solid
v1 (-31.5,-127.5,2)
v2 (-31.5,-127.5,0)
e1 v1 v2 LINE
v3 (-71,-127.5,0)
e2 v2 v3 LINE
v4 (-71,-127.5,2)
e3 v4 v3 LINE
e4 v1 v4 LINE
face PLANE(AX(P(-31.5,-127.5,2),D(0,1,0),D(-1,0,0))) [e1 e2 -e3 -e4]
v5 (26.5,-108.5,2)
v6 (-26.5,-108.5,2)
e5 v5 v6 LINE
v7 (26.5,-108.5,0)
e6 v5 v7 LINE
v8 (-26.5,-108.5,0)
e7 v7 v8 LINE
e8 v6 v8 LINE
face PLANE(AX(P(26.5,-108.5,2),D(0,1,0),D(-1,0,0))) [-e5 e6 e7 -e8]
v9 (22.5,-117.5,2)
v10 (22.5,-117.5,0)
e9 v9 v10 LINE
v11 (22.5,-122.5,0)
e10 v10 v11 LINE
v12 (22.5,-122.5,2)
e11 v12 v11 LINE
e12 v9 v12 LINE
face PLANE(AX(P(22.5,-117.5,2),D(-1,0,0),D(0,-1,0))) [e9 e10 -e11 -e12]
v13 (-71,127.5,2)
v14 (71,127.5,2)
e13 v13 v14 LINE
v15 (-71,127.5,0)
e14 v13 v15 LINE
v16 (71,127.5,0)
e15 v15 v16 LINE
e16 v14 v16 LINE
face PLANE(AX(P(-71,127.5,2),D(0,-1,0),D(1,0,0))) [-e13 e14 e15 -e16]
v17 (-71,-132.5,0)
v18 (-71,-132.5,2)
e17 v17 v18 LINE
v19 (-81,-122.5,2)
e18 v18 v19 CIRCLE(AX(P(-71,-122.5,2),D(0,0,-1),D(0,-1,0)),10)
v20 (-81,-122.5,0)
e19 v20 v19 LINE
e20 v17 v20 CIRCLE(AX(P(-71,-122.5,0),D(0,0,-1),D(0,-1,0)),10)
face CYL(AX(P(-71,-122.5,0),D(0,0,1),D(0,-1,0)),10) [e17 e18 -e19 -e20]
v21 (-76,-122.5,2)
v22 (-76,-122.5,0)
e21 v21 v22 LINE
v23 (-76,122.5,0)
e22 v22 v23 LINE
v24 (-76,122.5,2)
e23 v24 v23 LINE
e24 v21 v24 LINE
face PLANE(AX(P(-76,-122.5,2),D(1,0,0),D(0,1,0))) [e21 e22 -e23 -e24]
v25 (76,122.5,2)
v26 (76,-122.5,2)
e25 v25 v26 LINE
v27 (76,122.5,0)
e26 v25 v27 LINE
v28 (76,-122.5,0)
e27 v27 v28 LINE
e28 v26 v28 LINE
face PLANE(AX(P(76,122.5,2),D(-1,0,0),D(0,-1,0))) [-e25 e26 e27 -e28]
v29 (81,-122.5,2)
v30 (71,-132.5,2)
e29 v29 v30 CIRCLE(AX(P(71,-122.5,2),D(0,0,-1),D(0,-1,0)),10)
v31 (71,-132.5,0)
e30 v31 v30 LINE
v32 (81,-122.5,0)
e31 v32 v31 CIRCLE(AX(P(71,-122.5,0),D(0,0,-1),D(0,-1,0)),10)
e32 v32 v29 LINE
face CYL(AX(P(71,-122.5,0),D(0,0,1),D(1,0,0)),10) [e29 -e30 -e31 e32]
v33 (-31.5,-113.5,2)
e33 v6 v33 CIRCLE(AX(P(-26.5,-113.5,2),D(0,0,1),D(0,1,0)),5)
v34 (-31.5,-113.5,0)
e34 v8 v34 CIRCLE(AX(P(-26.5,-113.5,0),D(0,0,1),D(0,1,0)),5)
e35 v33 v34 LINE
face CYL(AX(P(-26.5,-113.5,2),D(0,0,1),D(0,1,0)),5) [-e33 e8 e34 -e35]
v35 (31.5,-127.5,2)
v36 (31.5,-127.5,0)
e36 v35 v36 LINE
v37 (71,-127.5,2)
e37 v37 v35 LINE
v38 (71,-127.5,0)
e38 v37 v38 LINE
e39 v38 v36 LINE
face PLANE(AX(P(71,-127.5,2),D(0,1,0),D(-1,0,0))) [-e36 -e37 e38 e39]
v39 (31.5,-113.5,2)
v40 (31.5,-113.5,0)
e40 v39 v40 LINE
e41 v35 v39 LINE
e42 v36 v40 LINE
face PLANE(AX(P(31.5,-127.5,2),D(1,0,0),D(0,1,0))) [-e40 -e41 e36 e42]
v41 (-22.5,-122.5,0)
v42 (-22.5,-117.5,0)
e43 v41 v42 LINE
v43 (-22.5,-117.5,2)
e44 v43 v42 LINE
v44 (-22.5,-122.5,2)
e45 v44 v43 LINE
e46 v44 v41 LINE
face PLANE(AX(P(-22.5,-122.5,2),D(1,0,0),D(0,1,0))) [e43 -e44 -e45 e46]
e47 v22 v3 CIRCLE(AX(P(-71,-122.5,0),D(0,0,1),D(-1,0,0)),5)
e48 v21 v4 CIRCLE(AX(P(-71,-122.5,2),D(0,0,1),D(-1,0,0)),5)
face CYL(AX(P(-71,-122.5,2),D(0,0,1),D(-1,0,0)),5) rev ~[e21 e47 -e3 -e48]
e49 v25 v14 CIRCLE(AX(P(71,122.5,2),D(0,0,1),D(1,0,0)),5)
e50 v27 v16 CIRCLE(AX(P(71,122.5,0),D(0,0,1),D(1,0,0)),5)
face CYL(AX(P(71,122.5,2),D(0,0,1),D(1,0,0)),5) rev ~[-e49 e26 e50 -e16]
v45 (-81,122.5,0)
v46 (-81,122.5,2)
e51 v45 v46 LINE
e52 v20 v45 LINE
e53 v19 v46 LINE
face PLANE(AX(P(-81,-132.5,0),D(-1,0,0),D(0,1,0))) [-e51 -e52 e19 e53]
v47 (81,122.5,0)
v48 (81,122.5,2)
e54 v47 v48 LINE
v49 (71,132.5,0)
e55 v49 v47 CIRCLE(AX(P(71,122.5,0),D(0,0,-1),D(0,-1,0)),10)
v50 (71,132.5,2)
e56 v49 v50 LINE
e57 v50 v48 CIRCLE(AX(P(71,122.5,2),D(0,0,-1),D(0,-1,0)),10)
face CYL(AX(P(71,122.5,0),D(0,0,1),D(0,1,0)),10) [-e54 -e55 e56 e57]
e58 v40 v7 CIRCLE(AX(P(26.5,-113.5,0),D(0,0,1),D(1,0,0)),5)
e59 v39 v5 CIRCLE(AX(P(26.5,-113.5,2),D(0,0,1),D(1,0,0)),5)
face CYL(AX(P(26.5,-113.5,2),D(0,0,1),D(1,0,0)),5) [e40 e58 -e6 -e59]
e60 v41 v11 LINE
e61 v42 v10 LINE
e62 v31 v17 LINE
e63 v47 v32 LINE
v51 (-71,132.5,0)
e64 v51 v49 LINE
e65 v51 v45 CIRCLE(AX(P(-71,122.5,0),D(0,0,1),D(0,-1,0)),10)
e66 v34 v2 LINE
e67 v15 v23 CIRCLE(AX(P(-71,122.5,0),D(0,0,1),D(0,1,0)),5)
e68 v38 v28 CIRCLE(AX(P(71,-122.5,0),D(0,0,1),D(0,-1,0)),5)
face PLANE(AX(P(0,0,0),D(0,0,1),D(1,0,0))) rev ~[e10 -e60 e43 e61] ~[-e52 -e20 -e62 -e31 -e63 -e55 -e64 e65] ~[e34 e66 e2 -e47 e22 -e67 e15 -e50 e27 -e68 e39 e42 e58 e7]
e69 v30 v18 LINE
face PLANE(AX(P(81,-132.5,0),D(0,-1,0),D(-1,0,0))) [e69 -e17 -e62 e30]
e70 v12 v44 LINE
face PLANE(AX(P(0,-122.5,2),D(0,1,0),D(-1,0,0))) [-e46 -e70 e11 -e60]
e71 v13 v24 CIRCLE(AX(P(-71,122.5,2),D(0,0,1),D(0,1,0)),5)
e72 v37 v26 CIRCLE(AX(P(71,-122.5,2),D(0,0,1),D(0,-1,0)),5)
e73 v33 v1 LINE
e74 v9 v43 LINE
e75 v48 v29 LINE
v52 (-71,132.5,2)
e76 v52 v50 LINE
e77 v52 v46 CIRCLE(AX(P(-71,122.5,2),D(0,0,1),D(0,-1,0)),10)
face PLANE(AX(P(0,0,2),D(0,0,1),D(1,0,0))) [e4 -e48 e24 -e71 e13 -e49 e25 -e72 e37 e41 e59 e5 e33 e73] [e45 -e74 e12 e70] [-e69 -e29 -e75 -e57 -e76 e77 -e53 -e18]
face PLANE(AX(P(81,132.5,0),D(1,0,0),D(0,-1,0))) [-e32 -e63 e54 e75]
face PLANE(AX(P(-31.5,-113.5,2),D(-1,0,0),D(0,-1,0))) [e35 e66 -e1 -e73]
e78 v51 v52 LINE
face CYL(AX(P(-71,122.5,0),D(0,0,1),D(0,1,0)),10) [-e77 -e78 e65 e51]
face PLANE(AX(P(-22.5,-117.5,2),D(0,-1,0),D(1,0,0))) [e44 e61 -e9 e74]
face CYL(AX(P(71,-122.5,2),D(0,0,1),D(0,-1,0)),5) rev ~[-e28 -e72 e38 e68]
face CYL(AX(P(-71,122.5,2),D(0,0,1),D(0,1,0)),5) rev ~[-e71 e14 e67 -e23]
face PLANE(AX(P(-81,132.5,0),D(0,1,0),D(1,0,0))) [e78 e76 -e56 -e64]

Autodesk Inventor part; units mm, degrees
ref_plane "YZ Plane" through (0, 0, 0) normal (1, 0, 0) x (0, 1, 0)
ref_plane "XZ Plane" through (0, 0, 0) normal (0, 1, 0) x (-1, 0, 0)
ref_plane "XY Plane" through (0, 0, 0) normal (0, 0, 1) x (1, 0, 0)
sketch "Skizze1" plane through (0, 0, 0) normal (0, 0, 1) x (1, 0, 0)
  line L0 (-81, 132.5) -> (81, 132.5)
  line L1 (81, 132.5) -> (81, -132.5)
  line L2 (81, -132.5) -> (-81, -132.5)
  line L3 (-81, -132.5) -> (-81, 132.5)
  line L4 (-81, 132.5) -> (81, -132.5) construction
  line L5 (81, 132.5) -> (-81, -132.5) construction
  point P0 (0, 0)
  dimension "d0" = 162
  dimension "d1" = 265
extrude "Grobblech1" add sketch "Skizze1" along normal blind 2
fillet "Eckenrundung1" radius 10 4 edges at (-81, 132.5, 1) (81, 132.5, 1) (81, -132.5, 1) (-81, -132.5, 1)
sketch "Skizze2" plane through (0, 0, 2) normal (0, 0, 1) x (1, 0, 0)
  arc A0 (-81, -122.5) -> (-71, -132.5) centre (-71, -122.5) ccw projected
  line L0 (71, -132.5) -> (-71, -132.5) projected
  arc A1 (71, -132.5) -> (81, -122.5) centre (71, -122.5) ccw projected
  line L1 (81, 122.5) -> (81, -122.5) projected
  arc A2 (81, 122.5) -> (71, 132.5) centre (71, 122.5) ccw projected
  line L2 (-71, 132.5) -> (71, 132.5) projected
  arc A3 (-71, 132.5) -> (-81, 122.5) centre (-71, 122.5) ccw projected
  line L3 (-81, -122.5) -> (-81, 122.5) projected
  arc A4 (76, 122.5) -> (71, 127.5) centre (71, 122.5) ccw
  line L4 (76, 122.5) -> (76, -122.5)
  arc A5 (71, -127.5) -> (76, -122.5) centre (71, -122.5) ccw
  line L5 (71, -127.5) -> (-71, -127.5)
  arc A6 (-76, -122.5) -> (-71, -127.5) centre (-71, -122.5) ccw
  line L6 (-76, -122.5) -> (-76, 122.5)
  arc A7 (-71, 127.5) -> (-76, 122.5) centre (-71, 122.5) ccw
  line L7 (-71, 127.5) -> (71, 127.5)
  line L8 (-135.5785, 0) -> (231.9734, 0) projected
  line L9 (0, -191.312) -> (0, 205.8747) projected
  line L10 (-22.5, -117.5) -> (22.5, -117.5)
  line L11 (22.5, -117.5) -> (22.5, -122.5)
  line L12 (22.5, -122.5) -> (-22.5, -122.5)
  line L13 (-22.5, -122.5) -> (-22.5, -117.5)
  line L14 (30, -127.5) -> (30, -108.5)
  line L15 (30, -108.5) -> (-30, -108.5)
  line L16 (-30, -108.5) -> (-30, -127.5)
  line L17 (-53.5621, 127.5) -> (-20.4158, 127.5) construction
  point P0 (0, 0)
  dimension "d4" = 5
  dimension "d7" = 45
  dimension "d8" = 5
  dimension "d10" = 9
  dimension "d70" = 10
  dimension "d71" = 60
extrude "Ausklinkung1" cut sketch "Skizze2" against normal blind 2 contours L12 L13 L10 L9 | L9 L10 L11 L12
sketch "Skizze5" plane through (0, 0, 2) normal (0, 0, 1) x (1, 0, 0)
  line L0 (-22.5, -122.5) -> (-22.5, -117.5) projected
  line L1 (-22.5, -117.5) -> (22.5, -117.5) projected
  line L2 (22.5, -117.5) -> (22.5, -122.5) projected
  line L3 (22.5, -122.5) -> (-22.5, -122.5) projected
  arc A0 (-81, -122.5) -> (-71, -132.5) centre (-71, -122.5) ccw projected
  line L4 (71, -132.5) -> (-71, -132.5) projected
  arc A1 (71, -132.5) -> (81, -122.5) centre (71, -122.5) ccw projected
  line L5 (81, 122.5) -> (81, -122.5) projected
  arc A2 (81, 122.5) -> (71, 132.5) centre (71, 122.5) ccw projected
  line L6 (-71, 132.5) -> (71, 132.5) projected
  arc A3 (-71, 132.5) -> (-81, 122.5) centre (-71, 122.5) ccw projected
  line L7 (-81, -122.5) -> (-81, 122.5) projected
  arc A4 (-71, 127.5) -> (-76, 122.5) centre (-71, 122.5) ccw
  line L8 (-71, 127.5) -> (71, 127.5)
  arc A5 (76, 122.5) -> (71, 127.5) centre (71, 122.5) ccw
  line L9 (76, 122.5) -> (76, -122.5)
  arc A6 (71, -127.5) -> (76, -122.5) centre (71, -122.5) ccw
  line L10 (71, -127.5) -> (-71, -127.5)
  arc A7 (-76, -122.5) -> (-71, -127.5) centre (-71, -122.5) ccw
  line L11 (-76, -122.5) -> (-76, 122.5)
  line L12 (26.5, -108.5) -> (-26.5, -108.5)
  line L13 (-31.5, -113.5) -> (-31.5, -132.5)
  line L14 (-31.5, -132.5) -> (31.5, -132.5)
  line L15 (31.5, -132.5) -> (31.5, -113.5)
  line L16 (-81, -122.5) -> (-81, 122.5) projected
  line L17 (31.5, -127.5) -> (-31.5, -127.5)
  line L18 (-31.5, -127.5) -> (-31.5, -113.5)
  line L19 (-26.5, -108.5) -> (26.5, -108.5)
  line L20 (31.5, -113.5) -> (31.5, -127.5)
  arc A8 (-26.5, -108.5) -> (-31.5, -113.5) centre (-26.5, -113.5) ccw
  arc A9 (31.5, -113.5) -> (26.5, -108.5) centre (26.5, -113.5) ccw
  line L21 (71, -132.5) -> (-71, -132.5) projected
  point P0 (0, 0)
  point P1 (31.5, -108.5)
  dimension "d37" = 5
  dimension "d38" = 9
  dimension "d41" = 5
extrude "Ausklinkung2" cut sketch "Skizze5" against normal blind 2 contours L10 A7 L11 A4 L8 A5 L9 A6 L15 A9 L12 A8 L13
equation "\"d17\" = Stärke"
equation "\"d39\" = Stärke"
equation "\"d2\" = Stärke"
equation "\"Biegeradius\" = Stärke"
equation "\"BreiteBiegungsfreistellung\" = Stärke"
equation "\"TiefeBiegungsfreistellung\" = 0.5 * Stärke"
equation "\"GrößeEckenfreistellung\" = 4 * Stärke"
equation "\"MinimalRest\" = 2 * Stärke"
equation "\"Übergangsradius\" = Biegeradius"
equation "\"JacobiRadiusGröße\" = Biegeradius"
equation "\"Abstandsgröße\" = Stärke"
equation "\"Stärke\" = 2"
properties part number "Rost_Basis"
